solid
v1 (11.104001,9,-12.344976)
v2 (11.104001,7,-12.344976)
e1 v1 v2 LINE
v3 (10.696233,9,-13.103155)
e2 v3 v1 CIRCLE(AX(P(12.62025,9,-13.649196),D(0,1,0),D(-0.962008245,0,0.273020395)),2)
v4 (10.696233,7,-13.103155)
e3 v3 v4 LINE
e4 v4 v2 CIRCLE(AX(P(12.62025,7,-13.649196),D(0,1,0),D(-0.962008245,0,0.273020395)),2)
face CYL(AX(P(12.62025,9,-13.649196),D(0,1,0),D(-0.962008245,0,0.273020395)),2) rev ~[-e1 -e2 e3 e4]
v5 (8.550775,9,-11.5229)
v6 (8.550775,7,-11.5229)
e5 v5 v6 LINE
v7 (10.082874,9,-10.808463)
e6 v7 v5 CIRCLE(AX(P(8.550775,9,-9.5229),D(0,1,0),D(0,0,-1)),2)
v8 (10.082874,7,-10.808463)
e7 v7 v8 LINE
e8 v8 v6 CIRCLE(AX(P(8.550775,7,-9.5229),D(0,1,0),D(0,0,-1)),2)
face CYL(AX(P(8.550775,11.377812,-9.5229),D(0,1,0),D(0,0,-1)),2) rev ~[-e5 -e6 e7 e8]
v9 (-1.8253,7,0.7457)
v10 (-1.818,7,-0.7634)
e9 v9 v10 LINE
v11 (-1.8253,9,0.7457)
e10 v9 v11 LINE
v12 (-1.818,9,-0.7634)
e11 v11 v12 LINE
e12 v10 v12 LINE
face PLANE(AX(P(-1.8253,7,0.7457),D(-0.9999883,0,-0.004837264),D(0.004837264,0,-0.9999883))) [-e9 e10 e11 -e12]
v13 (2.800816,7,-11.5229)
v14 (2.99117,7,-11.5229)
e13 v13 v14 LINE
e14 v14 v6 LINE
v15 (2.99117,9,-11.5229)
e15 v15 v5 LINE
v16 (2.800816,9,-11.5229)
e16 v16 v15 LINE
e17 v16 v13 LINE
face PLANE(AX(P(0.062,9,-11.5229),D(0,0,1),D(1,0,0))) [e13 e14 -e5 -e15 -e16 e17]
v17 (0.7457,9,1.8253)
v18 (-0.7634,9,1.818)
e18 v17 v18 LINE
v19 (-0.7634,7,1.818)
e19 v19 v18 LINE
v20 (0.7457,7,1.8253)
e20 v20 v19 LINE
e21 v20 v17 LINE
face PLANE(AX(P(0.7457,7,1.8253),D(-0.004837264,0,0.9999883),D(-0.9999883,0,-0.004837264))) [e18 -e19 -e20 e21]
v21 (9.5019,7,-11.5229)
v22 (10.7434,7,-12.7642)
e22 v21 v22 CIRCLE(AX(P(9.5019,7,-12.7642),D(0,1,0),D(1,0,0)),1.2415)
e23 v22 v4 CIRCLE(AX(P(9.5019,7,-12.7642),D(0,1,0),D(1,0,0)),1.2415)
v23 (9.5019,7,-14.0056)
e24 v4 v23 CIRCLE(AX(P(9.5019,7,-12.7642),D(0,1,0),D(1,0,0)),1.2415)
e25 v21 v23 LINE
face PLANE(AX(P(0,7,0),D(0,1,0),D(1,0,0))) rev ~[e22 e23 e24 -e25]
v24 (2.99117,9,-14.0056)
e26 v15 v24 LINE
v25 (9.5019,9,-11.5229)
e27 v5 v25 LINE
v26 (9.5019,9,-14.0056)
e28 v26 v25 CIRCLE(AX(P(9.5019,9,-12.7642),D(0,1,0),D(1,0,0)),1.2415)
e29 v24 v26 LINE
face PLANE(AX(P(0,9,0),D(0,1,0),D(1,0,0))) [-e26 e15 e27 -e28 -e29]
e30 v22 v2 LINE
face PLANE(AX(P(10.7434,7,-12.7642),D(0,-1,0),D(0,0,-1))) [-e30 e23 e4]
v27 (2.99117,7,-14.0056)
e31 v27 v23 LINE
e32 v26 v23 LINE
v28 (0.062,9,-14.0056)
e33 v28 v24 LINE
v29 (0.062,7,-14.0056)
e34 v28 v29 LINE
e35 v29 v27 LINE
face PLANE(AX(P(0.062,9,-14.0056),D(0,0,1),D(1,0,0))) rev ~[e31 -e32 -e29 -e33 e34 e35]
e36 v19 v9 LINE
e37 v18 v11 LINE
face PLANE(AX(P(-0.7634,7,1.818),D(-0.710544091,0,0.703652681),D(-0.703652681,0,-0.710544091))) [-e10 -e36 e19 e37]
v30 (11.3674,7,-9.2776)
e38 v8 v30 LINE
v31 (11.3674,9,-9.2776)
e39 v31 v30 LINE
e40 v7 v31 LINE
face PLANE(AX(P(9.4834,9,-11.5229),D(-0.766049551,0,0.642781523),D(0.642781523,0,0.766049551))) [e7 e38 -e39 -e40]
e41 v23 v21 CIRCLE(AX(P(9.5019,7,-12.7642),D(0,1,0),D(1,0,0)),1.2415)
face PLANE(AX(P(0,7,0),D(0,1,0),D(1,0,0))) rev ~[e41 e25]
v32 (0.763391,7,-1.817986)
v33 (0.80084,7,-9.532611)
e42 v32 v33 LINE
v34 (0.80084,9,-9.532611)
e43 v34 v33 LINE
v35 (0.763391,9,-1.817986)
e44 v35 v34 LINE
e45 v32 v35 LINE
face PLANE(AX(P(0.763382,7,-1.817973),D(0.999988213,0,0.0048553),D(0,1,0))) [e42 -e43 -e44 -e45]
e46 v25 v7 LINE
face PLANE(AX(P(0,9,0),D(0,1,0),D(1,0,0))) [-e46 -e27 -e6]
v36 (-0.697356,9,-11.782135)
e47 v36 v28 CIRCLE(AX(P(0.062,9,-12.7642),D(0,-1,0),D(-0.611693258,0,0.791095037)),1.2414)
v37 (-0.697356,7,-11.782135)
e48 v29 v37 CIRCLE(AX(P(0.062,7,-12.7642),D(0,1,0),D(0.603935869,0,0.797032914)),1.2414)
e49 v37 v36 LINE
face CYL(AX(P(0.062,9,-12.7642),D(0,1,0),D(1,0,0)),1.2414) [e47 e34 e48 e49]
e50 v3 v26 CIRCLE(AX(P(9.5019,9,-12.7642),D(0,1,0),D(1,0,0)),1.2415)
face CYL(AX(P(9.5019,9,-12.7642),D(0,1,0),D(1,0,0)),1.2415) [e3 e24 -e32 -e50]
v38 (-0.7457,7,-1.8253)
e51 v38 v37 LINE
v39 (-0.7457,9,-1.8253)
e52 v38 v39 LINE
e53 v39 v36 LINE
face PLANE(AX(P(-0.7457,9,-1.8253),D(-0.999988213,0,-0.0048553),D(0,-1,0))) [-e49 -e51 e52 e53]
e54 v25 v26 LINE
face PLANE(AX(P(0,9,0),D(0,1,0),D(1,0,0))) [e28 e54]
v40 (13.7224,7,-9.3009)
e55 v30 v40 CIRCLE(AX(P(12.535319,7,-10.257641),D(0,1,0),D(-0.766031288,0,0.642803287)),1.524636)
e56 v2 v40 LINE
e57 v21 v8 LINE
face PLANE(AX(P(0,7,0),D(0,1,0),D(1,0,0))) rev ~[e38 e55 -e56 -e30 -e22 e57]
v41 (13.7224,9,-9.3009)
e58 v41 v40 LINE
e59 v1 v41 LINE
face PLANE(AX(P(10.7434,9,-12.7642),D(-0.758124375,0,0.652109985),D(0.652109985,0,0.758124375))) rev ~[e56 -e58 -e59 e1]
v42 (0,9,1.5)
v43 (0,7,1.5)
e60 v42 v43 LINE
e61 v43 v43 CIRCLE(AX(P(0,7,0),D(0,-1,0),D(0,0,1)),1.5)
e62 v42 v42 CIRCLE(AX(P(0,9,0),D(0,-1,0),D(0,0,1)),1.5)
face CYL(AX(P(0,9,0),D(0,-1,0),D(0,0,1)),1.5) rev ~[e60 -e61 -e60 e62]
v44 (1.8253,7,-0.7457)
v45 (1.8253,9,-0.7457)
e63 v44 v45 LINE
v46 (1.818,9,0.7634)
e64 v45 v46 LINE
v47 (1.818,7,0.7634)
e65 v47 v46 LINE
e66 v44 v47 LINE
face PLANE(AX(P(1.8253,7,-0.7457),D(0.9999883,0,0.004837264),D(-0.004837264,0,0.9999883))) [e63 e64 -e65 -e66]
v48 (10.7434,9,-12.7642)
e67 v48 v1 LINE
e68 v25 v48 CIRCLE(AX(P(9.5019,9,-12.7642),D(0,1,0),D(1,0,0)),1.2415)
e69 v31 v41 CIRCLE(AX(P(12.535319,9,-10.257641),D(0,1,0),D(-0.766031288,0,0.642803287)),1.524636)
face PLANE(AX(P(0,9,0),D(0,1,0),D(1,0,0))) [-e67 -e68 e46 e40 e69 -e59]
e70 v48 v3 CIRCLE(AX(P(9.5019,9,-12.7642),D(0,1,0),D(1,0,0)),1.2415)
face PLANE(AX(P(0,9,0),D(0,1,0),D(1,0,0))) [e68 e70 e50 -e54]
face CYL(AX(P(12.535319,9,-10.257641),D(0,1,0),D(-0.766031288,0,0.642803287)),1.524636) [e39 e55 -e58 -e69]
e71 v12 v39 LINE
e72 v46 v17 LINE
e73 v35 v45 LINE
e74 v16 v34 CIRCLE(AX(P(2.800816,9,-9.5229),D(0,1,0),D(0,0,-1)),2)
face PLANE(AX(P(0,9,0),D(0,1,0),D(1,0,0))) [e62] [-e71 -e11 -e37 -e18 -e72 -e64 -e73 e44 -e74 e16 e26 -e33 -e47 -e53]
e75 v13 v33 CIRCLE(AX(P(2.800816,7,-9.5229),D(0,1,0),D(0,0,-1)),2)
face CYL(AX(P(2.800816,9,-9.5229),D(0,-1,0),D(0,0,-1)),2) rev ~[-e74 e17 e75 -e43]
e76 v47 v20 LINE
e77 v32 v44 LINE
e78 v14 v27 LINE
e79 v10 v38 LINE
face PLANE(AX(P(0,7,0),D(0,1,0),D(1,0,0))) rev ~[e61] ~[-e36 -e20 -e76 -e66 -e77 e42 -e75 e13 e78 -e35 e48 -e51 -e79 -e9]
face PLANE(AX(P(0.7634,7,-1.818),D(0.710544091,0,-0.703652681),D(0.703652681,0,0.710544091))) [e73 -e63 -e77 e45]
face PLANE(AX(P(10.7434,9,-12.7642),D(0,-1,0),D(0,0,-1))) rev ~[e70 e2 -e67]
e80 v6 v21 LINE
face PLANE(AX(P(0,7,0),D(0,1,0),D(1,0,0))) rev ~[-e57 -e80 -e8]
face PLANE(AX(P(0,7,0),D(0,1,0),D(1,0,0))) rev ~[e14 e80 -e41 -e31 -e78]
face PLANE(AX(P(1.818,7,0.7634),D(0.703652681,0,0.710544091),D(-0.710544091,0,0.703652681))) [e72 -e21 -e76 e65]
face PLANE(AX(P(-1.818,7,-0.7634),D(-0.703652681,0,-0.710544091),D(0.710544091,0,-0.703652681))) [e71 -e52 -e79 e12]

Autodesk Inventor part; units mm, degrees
ref_plane "Work Plane1" through (0, 7, 0) normal (0, 1, 0) x (1, 0, 0)
sketch "Sketch3" plane through (0, 7, 0) normal (0, 1, 0) x (1, 0, 0)
  line L0 (1.8253, 0.7457) -> (1.818, -0.7634)
  line L1 (1.818, -0.7634) -> (0.7457, -1.8253)
  line L2 (0.7457, -1.8253) -> (-0.7634, -1.818)
  line L3 (-0.7634, -1.818) -> (-1.8253, -0.7457)
  line L4 (-1.8253, -0.7457) -> (-1.818, 0.7634)
  line L5 (-1.818, 0.7634) -> (-0.7457, 1.8253)
  line L6 (-0.7457, 1.8253) -> (0.7634, 1.818)
  line L7 (0.7634, 1.818) -> (1.8253, 0.7457)
  line L8 (-1.8216, 0.0088) -> (1.8216, -0.0088) construction
  line L9 (-0.0088, -1.8216) -> (0.0088, 1.8216) construction
  point P0 (0, 0)
  point P1 (0, 0)
  point P2 (0, 0)
  point P3 (0, 0)
extrude "Extrusion2" add sketch "Sketch3" along normal blind 2
ref_plane "Work Plane2" through (-0.7457, 7, -1.8253) normal (0.0048553, 0, -0.9999882) x (-0.9999882, 0, -0.0048553)
sketch "Sketch4" plane through (-0.7457, 7, -1.8253) normal (0.0048553, 0, -0.9999882) x (-0.9999882, 0, -0.0048553)
  line L0 (-1.5091, 2) -> (0, 2)
  line L1 (0, 2) -> (0, 0)
  line L2 (0, 0) -> (-1.5091, 0)
  line L3 (-1.5091, 0) -> (-1.5091, 2)
  point P0 (-0.7546, -7)
extrude "Extrusion3" add sketch "Sketch4" along normal blind 10
sketch "Sketch5" plane through (0, 9, 0) normal (0, 1, 0) x (1, 0, 0)
  point P0 (0, 0)
sketch "Sketch6" plane through (0, 9, 0) normal (0, 1, 0) x (1, 0, 0)
  point P0 (0, 0)
sketch "Sketch7" plane through (0, 9, 0) normal (0, 1, 0) x (1, 0, 0)
  circle A0 centre (0.062, 12.7642) radius 1.2414
  point P0 (0, 0)
extrude "Extrusion4" add sketch "Sketch7" against normal blind 2
sketch "Sketch8" plane through (0, 9, 0) normal (0, 1, 0) x (1, 0, 0)
  point P0 (0, 0)
sketch "Sketch9" plane through (0, 9, 0) normal (0, 1, 0) x (1, 0, 0)
  point P0 (0, 0)
sketch "Sketch11" plane through (0, 9, 0) normal (0, 1, 0) x (1, 0, 0)
  point P0 (0, 0)
sketch "Sketch12" plane through (0, 9, 0) normal (0, 1, 0) x (1, 0, 0)
  point P0 (0, 0)
ref_plane "Work Plane3" through (0, 9, 0) normal (0, 1, 0) x (1, 0, 0)
sketch "Sketch13" plane through (0, 9, 0) normal (0, 1, 0) x (1, 0, 0)
  line L0 (0.062, 11.5229) -> (9.5019, 11.5229)
  line L1 (0.062, 11.5229) -> (0.062, 14.0056)
  arc A0 (0.8117, 11.7749) -> (-0.6974, 11.7822) centre (0.062, 12.7642) ccw projected
  line L2 (0.062, 14.0056) -> (9.5019, 14.0056)
  line L3 (9.5019, 11.5229) -> (9.5019, 14.0056)
  point P0 (0, 0)
extrude "Extrusion6" add sketch "Sketch13" against normal blind 2
ref_plane "Work Plane4" through (0, 9, 0) normal (0, 1, 0) x (1, 0, 0)
sketch "Sketch14" plane through (0, 9, 0) normal (0, 1, 0) x (1, 0, 0)
  line L0 (9.5019, 14.0056) -> (9.5019, 11.5229) projected
  circle A0 centre (9.5019, 12.7642) radius 1.2415
  point P0 (0, 0)
  dimension "d17" = 2.483
extrude "Extrusion7" add sketch "Sketch14" against normal blind 2
ref_plane "Work Plane5" through (0, 9, 0) normal (0, 1, 0) x (1, 0, 0)
sketch "Sketch15" plane through (0, 9, 0) normal (0, 1, 0) x (1, 0, 0)
  arc A0 (9.4834, 11.5229) -> (9.4834, 14.0056) centre (9.5019, 12.7642) ccw projected
  line L0 (10.7434, 12.7642) -> (13.7224, 9.3009)
  line L1 (9.4834, 11.5229) -> (11.3674, 9.2776)
  line L2 (9.4834, 11.5229) -> (12.4144, 11.5229) construction
  arc A1 (11.3674, 9.2776) -> (13.7224, 9.3009) centre (12.5353, 10.2576) ccw
  point P0 (0, 0)
  dimension "d20" = 50
extrude "Extrusion8" add sketch "Sketch15" against normal blind 2
sketch "Sketch16" plane through (0, 9, 0) normal (0, 1, 0) x (1, 0, 0)
  point P0 (0, 0)
hole "Hole1" at (0, 9, 0) direction (0, -1, 0) diameter 3 end through all
thread "Thread2" size "M3x0.5" class "6H" standard "ANSI Metric M Profile" full length
fillet "Fillet1" radius 2 1 edges at (0.8105, 8, -11.5229)
fillet "Fillet2" radius 2 1 edges at (9.5019, 8, -11.5229)
fillet "Fillet3" radius 2 1 edges at (10.7434, 8, -12.7642)
properties part number "Servo_Arm_Hook_F"
